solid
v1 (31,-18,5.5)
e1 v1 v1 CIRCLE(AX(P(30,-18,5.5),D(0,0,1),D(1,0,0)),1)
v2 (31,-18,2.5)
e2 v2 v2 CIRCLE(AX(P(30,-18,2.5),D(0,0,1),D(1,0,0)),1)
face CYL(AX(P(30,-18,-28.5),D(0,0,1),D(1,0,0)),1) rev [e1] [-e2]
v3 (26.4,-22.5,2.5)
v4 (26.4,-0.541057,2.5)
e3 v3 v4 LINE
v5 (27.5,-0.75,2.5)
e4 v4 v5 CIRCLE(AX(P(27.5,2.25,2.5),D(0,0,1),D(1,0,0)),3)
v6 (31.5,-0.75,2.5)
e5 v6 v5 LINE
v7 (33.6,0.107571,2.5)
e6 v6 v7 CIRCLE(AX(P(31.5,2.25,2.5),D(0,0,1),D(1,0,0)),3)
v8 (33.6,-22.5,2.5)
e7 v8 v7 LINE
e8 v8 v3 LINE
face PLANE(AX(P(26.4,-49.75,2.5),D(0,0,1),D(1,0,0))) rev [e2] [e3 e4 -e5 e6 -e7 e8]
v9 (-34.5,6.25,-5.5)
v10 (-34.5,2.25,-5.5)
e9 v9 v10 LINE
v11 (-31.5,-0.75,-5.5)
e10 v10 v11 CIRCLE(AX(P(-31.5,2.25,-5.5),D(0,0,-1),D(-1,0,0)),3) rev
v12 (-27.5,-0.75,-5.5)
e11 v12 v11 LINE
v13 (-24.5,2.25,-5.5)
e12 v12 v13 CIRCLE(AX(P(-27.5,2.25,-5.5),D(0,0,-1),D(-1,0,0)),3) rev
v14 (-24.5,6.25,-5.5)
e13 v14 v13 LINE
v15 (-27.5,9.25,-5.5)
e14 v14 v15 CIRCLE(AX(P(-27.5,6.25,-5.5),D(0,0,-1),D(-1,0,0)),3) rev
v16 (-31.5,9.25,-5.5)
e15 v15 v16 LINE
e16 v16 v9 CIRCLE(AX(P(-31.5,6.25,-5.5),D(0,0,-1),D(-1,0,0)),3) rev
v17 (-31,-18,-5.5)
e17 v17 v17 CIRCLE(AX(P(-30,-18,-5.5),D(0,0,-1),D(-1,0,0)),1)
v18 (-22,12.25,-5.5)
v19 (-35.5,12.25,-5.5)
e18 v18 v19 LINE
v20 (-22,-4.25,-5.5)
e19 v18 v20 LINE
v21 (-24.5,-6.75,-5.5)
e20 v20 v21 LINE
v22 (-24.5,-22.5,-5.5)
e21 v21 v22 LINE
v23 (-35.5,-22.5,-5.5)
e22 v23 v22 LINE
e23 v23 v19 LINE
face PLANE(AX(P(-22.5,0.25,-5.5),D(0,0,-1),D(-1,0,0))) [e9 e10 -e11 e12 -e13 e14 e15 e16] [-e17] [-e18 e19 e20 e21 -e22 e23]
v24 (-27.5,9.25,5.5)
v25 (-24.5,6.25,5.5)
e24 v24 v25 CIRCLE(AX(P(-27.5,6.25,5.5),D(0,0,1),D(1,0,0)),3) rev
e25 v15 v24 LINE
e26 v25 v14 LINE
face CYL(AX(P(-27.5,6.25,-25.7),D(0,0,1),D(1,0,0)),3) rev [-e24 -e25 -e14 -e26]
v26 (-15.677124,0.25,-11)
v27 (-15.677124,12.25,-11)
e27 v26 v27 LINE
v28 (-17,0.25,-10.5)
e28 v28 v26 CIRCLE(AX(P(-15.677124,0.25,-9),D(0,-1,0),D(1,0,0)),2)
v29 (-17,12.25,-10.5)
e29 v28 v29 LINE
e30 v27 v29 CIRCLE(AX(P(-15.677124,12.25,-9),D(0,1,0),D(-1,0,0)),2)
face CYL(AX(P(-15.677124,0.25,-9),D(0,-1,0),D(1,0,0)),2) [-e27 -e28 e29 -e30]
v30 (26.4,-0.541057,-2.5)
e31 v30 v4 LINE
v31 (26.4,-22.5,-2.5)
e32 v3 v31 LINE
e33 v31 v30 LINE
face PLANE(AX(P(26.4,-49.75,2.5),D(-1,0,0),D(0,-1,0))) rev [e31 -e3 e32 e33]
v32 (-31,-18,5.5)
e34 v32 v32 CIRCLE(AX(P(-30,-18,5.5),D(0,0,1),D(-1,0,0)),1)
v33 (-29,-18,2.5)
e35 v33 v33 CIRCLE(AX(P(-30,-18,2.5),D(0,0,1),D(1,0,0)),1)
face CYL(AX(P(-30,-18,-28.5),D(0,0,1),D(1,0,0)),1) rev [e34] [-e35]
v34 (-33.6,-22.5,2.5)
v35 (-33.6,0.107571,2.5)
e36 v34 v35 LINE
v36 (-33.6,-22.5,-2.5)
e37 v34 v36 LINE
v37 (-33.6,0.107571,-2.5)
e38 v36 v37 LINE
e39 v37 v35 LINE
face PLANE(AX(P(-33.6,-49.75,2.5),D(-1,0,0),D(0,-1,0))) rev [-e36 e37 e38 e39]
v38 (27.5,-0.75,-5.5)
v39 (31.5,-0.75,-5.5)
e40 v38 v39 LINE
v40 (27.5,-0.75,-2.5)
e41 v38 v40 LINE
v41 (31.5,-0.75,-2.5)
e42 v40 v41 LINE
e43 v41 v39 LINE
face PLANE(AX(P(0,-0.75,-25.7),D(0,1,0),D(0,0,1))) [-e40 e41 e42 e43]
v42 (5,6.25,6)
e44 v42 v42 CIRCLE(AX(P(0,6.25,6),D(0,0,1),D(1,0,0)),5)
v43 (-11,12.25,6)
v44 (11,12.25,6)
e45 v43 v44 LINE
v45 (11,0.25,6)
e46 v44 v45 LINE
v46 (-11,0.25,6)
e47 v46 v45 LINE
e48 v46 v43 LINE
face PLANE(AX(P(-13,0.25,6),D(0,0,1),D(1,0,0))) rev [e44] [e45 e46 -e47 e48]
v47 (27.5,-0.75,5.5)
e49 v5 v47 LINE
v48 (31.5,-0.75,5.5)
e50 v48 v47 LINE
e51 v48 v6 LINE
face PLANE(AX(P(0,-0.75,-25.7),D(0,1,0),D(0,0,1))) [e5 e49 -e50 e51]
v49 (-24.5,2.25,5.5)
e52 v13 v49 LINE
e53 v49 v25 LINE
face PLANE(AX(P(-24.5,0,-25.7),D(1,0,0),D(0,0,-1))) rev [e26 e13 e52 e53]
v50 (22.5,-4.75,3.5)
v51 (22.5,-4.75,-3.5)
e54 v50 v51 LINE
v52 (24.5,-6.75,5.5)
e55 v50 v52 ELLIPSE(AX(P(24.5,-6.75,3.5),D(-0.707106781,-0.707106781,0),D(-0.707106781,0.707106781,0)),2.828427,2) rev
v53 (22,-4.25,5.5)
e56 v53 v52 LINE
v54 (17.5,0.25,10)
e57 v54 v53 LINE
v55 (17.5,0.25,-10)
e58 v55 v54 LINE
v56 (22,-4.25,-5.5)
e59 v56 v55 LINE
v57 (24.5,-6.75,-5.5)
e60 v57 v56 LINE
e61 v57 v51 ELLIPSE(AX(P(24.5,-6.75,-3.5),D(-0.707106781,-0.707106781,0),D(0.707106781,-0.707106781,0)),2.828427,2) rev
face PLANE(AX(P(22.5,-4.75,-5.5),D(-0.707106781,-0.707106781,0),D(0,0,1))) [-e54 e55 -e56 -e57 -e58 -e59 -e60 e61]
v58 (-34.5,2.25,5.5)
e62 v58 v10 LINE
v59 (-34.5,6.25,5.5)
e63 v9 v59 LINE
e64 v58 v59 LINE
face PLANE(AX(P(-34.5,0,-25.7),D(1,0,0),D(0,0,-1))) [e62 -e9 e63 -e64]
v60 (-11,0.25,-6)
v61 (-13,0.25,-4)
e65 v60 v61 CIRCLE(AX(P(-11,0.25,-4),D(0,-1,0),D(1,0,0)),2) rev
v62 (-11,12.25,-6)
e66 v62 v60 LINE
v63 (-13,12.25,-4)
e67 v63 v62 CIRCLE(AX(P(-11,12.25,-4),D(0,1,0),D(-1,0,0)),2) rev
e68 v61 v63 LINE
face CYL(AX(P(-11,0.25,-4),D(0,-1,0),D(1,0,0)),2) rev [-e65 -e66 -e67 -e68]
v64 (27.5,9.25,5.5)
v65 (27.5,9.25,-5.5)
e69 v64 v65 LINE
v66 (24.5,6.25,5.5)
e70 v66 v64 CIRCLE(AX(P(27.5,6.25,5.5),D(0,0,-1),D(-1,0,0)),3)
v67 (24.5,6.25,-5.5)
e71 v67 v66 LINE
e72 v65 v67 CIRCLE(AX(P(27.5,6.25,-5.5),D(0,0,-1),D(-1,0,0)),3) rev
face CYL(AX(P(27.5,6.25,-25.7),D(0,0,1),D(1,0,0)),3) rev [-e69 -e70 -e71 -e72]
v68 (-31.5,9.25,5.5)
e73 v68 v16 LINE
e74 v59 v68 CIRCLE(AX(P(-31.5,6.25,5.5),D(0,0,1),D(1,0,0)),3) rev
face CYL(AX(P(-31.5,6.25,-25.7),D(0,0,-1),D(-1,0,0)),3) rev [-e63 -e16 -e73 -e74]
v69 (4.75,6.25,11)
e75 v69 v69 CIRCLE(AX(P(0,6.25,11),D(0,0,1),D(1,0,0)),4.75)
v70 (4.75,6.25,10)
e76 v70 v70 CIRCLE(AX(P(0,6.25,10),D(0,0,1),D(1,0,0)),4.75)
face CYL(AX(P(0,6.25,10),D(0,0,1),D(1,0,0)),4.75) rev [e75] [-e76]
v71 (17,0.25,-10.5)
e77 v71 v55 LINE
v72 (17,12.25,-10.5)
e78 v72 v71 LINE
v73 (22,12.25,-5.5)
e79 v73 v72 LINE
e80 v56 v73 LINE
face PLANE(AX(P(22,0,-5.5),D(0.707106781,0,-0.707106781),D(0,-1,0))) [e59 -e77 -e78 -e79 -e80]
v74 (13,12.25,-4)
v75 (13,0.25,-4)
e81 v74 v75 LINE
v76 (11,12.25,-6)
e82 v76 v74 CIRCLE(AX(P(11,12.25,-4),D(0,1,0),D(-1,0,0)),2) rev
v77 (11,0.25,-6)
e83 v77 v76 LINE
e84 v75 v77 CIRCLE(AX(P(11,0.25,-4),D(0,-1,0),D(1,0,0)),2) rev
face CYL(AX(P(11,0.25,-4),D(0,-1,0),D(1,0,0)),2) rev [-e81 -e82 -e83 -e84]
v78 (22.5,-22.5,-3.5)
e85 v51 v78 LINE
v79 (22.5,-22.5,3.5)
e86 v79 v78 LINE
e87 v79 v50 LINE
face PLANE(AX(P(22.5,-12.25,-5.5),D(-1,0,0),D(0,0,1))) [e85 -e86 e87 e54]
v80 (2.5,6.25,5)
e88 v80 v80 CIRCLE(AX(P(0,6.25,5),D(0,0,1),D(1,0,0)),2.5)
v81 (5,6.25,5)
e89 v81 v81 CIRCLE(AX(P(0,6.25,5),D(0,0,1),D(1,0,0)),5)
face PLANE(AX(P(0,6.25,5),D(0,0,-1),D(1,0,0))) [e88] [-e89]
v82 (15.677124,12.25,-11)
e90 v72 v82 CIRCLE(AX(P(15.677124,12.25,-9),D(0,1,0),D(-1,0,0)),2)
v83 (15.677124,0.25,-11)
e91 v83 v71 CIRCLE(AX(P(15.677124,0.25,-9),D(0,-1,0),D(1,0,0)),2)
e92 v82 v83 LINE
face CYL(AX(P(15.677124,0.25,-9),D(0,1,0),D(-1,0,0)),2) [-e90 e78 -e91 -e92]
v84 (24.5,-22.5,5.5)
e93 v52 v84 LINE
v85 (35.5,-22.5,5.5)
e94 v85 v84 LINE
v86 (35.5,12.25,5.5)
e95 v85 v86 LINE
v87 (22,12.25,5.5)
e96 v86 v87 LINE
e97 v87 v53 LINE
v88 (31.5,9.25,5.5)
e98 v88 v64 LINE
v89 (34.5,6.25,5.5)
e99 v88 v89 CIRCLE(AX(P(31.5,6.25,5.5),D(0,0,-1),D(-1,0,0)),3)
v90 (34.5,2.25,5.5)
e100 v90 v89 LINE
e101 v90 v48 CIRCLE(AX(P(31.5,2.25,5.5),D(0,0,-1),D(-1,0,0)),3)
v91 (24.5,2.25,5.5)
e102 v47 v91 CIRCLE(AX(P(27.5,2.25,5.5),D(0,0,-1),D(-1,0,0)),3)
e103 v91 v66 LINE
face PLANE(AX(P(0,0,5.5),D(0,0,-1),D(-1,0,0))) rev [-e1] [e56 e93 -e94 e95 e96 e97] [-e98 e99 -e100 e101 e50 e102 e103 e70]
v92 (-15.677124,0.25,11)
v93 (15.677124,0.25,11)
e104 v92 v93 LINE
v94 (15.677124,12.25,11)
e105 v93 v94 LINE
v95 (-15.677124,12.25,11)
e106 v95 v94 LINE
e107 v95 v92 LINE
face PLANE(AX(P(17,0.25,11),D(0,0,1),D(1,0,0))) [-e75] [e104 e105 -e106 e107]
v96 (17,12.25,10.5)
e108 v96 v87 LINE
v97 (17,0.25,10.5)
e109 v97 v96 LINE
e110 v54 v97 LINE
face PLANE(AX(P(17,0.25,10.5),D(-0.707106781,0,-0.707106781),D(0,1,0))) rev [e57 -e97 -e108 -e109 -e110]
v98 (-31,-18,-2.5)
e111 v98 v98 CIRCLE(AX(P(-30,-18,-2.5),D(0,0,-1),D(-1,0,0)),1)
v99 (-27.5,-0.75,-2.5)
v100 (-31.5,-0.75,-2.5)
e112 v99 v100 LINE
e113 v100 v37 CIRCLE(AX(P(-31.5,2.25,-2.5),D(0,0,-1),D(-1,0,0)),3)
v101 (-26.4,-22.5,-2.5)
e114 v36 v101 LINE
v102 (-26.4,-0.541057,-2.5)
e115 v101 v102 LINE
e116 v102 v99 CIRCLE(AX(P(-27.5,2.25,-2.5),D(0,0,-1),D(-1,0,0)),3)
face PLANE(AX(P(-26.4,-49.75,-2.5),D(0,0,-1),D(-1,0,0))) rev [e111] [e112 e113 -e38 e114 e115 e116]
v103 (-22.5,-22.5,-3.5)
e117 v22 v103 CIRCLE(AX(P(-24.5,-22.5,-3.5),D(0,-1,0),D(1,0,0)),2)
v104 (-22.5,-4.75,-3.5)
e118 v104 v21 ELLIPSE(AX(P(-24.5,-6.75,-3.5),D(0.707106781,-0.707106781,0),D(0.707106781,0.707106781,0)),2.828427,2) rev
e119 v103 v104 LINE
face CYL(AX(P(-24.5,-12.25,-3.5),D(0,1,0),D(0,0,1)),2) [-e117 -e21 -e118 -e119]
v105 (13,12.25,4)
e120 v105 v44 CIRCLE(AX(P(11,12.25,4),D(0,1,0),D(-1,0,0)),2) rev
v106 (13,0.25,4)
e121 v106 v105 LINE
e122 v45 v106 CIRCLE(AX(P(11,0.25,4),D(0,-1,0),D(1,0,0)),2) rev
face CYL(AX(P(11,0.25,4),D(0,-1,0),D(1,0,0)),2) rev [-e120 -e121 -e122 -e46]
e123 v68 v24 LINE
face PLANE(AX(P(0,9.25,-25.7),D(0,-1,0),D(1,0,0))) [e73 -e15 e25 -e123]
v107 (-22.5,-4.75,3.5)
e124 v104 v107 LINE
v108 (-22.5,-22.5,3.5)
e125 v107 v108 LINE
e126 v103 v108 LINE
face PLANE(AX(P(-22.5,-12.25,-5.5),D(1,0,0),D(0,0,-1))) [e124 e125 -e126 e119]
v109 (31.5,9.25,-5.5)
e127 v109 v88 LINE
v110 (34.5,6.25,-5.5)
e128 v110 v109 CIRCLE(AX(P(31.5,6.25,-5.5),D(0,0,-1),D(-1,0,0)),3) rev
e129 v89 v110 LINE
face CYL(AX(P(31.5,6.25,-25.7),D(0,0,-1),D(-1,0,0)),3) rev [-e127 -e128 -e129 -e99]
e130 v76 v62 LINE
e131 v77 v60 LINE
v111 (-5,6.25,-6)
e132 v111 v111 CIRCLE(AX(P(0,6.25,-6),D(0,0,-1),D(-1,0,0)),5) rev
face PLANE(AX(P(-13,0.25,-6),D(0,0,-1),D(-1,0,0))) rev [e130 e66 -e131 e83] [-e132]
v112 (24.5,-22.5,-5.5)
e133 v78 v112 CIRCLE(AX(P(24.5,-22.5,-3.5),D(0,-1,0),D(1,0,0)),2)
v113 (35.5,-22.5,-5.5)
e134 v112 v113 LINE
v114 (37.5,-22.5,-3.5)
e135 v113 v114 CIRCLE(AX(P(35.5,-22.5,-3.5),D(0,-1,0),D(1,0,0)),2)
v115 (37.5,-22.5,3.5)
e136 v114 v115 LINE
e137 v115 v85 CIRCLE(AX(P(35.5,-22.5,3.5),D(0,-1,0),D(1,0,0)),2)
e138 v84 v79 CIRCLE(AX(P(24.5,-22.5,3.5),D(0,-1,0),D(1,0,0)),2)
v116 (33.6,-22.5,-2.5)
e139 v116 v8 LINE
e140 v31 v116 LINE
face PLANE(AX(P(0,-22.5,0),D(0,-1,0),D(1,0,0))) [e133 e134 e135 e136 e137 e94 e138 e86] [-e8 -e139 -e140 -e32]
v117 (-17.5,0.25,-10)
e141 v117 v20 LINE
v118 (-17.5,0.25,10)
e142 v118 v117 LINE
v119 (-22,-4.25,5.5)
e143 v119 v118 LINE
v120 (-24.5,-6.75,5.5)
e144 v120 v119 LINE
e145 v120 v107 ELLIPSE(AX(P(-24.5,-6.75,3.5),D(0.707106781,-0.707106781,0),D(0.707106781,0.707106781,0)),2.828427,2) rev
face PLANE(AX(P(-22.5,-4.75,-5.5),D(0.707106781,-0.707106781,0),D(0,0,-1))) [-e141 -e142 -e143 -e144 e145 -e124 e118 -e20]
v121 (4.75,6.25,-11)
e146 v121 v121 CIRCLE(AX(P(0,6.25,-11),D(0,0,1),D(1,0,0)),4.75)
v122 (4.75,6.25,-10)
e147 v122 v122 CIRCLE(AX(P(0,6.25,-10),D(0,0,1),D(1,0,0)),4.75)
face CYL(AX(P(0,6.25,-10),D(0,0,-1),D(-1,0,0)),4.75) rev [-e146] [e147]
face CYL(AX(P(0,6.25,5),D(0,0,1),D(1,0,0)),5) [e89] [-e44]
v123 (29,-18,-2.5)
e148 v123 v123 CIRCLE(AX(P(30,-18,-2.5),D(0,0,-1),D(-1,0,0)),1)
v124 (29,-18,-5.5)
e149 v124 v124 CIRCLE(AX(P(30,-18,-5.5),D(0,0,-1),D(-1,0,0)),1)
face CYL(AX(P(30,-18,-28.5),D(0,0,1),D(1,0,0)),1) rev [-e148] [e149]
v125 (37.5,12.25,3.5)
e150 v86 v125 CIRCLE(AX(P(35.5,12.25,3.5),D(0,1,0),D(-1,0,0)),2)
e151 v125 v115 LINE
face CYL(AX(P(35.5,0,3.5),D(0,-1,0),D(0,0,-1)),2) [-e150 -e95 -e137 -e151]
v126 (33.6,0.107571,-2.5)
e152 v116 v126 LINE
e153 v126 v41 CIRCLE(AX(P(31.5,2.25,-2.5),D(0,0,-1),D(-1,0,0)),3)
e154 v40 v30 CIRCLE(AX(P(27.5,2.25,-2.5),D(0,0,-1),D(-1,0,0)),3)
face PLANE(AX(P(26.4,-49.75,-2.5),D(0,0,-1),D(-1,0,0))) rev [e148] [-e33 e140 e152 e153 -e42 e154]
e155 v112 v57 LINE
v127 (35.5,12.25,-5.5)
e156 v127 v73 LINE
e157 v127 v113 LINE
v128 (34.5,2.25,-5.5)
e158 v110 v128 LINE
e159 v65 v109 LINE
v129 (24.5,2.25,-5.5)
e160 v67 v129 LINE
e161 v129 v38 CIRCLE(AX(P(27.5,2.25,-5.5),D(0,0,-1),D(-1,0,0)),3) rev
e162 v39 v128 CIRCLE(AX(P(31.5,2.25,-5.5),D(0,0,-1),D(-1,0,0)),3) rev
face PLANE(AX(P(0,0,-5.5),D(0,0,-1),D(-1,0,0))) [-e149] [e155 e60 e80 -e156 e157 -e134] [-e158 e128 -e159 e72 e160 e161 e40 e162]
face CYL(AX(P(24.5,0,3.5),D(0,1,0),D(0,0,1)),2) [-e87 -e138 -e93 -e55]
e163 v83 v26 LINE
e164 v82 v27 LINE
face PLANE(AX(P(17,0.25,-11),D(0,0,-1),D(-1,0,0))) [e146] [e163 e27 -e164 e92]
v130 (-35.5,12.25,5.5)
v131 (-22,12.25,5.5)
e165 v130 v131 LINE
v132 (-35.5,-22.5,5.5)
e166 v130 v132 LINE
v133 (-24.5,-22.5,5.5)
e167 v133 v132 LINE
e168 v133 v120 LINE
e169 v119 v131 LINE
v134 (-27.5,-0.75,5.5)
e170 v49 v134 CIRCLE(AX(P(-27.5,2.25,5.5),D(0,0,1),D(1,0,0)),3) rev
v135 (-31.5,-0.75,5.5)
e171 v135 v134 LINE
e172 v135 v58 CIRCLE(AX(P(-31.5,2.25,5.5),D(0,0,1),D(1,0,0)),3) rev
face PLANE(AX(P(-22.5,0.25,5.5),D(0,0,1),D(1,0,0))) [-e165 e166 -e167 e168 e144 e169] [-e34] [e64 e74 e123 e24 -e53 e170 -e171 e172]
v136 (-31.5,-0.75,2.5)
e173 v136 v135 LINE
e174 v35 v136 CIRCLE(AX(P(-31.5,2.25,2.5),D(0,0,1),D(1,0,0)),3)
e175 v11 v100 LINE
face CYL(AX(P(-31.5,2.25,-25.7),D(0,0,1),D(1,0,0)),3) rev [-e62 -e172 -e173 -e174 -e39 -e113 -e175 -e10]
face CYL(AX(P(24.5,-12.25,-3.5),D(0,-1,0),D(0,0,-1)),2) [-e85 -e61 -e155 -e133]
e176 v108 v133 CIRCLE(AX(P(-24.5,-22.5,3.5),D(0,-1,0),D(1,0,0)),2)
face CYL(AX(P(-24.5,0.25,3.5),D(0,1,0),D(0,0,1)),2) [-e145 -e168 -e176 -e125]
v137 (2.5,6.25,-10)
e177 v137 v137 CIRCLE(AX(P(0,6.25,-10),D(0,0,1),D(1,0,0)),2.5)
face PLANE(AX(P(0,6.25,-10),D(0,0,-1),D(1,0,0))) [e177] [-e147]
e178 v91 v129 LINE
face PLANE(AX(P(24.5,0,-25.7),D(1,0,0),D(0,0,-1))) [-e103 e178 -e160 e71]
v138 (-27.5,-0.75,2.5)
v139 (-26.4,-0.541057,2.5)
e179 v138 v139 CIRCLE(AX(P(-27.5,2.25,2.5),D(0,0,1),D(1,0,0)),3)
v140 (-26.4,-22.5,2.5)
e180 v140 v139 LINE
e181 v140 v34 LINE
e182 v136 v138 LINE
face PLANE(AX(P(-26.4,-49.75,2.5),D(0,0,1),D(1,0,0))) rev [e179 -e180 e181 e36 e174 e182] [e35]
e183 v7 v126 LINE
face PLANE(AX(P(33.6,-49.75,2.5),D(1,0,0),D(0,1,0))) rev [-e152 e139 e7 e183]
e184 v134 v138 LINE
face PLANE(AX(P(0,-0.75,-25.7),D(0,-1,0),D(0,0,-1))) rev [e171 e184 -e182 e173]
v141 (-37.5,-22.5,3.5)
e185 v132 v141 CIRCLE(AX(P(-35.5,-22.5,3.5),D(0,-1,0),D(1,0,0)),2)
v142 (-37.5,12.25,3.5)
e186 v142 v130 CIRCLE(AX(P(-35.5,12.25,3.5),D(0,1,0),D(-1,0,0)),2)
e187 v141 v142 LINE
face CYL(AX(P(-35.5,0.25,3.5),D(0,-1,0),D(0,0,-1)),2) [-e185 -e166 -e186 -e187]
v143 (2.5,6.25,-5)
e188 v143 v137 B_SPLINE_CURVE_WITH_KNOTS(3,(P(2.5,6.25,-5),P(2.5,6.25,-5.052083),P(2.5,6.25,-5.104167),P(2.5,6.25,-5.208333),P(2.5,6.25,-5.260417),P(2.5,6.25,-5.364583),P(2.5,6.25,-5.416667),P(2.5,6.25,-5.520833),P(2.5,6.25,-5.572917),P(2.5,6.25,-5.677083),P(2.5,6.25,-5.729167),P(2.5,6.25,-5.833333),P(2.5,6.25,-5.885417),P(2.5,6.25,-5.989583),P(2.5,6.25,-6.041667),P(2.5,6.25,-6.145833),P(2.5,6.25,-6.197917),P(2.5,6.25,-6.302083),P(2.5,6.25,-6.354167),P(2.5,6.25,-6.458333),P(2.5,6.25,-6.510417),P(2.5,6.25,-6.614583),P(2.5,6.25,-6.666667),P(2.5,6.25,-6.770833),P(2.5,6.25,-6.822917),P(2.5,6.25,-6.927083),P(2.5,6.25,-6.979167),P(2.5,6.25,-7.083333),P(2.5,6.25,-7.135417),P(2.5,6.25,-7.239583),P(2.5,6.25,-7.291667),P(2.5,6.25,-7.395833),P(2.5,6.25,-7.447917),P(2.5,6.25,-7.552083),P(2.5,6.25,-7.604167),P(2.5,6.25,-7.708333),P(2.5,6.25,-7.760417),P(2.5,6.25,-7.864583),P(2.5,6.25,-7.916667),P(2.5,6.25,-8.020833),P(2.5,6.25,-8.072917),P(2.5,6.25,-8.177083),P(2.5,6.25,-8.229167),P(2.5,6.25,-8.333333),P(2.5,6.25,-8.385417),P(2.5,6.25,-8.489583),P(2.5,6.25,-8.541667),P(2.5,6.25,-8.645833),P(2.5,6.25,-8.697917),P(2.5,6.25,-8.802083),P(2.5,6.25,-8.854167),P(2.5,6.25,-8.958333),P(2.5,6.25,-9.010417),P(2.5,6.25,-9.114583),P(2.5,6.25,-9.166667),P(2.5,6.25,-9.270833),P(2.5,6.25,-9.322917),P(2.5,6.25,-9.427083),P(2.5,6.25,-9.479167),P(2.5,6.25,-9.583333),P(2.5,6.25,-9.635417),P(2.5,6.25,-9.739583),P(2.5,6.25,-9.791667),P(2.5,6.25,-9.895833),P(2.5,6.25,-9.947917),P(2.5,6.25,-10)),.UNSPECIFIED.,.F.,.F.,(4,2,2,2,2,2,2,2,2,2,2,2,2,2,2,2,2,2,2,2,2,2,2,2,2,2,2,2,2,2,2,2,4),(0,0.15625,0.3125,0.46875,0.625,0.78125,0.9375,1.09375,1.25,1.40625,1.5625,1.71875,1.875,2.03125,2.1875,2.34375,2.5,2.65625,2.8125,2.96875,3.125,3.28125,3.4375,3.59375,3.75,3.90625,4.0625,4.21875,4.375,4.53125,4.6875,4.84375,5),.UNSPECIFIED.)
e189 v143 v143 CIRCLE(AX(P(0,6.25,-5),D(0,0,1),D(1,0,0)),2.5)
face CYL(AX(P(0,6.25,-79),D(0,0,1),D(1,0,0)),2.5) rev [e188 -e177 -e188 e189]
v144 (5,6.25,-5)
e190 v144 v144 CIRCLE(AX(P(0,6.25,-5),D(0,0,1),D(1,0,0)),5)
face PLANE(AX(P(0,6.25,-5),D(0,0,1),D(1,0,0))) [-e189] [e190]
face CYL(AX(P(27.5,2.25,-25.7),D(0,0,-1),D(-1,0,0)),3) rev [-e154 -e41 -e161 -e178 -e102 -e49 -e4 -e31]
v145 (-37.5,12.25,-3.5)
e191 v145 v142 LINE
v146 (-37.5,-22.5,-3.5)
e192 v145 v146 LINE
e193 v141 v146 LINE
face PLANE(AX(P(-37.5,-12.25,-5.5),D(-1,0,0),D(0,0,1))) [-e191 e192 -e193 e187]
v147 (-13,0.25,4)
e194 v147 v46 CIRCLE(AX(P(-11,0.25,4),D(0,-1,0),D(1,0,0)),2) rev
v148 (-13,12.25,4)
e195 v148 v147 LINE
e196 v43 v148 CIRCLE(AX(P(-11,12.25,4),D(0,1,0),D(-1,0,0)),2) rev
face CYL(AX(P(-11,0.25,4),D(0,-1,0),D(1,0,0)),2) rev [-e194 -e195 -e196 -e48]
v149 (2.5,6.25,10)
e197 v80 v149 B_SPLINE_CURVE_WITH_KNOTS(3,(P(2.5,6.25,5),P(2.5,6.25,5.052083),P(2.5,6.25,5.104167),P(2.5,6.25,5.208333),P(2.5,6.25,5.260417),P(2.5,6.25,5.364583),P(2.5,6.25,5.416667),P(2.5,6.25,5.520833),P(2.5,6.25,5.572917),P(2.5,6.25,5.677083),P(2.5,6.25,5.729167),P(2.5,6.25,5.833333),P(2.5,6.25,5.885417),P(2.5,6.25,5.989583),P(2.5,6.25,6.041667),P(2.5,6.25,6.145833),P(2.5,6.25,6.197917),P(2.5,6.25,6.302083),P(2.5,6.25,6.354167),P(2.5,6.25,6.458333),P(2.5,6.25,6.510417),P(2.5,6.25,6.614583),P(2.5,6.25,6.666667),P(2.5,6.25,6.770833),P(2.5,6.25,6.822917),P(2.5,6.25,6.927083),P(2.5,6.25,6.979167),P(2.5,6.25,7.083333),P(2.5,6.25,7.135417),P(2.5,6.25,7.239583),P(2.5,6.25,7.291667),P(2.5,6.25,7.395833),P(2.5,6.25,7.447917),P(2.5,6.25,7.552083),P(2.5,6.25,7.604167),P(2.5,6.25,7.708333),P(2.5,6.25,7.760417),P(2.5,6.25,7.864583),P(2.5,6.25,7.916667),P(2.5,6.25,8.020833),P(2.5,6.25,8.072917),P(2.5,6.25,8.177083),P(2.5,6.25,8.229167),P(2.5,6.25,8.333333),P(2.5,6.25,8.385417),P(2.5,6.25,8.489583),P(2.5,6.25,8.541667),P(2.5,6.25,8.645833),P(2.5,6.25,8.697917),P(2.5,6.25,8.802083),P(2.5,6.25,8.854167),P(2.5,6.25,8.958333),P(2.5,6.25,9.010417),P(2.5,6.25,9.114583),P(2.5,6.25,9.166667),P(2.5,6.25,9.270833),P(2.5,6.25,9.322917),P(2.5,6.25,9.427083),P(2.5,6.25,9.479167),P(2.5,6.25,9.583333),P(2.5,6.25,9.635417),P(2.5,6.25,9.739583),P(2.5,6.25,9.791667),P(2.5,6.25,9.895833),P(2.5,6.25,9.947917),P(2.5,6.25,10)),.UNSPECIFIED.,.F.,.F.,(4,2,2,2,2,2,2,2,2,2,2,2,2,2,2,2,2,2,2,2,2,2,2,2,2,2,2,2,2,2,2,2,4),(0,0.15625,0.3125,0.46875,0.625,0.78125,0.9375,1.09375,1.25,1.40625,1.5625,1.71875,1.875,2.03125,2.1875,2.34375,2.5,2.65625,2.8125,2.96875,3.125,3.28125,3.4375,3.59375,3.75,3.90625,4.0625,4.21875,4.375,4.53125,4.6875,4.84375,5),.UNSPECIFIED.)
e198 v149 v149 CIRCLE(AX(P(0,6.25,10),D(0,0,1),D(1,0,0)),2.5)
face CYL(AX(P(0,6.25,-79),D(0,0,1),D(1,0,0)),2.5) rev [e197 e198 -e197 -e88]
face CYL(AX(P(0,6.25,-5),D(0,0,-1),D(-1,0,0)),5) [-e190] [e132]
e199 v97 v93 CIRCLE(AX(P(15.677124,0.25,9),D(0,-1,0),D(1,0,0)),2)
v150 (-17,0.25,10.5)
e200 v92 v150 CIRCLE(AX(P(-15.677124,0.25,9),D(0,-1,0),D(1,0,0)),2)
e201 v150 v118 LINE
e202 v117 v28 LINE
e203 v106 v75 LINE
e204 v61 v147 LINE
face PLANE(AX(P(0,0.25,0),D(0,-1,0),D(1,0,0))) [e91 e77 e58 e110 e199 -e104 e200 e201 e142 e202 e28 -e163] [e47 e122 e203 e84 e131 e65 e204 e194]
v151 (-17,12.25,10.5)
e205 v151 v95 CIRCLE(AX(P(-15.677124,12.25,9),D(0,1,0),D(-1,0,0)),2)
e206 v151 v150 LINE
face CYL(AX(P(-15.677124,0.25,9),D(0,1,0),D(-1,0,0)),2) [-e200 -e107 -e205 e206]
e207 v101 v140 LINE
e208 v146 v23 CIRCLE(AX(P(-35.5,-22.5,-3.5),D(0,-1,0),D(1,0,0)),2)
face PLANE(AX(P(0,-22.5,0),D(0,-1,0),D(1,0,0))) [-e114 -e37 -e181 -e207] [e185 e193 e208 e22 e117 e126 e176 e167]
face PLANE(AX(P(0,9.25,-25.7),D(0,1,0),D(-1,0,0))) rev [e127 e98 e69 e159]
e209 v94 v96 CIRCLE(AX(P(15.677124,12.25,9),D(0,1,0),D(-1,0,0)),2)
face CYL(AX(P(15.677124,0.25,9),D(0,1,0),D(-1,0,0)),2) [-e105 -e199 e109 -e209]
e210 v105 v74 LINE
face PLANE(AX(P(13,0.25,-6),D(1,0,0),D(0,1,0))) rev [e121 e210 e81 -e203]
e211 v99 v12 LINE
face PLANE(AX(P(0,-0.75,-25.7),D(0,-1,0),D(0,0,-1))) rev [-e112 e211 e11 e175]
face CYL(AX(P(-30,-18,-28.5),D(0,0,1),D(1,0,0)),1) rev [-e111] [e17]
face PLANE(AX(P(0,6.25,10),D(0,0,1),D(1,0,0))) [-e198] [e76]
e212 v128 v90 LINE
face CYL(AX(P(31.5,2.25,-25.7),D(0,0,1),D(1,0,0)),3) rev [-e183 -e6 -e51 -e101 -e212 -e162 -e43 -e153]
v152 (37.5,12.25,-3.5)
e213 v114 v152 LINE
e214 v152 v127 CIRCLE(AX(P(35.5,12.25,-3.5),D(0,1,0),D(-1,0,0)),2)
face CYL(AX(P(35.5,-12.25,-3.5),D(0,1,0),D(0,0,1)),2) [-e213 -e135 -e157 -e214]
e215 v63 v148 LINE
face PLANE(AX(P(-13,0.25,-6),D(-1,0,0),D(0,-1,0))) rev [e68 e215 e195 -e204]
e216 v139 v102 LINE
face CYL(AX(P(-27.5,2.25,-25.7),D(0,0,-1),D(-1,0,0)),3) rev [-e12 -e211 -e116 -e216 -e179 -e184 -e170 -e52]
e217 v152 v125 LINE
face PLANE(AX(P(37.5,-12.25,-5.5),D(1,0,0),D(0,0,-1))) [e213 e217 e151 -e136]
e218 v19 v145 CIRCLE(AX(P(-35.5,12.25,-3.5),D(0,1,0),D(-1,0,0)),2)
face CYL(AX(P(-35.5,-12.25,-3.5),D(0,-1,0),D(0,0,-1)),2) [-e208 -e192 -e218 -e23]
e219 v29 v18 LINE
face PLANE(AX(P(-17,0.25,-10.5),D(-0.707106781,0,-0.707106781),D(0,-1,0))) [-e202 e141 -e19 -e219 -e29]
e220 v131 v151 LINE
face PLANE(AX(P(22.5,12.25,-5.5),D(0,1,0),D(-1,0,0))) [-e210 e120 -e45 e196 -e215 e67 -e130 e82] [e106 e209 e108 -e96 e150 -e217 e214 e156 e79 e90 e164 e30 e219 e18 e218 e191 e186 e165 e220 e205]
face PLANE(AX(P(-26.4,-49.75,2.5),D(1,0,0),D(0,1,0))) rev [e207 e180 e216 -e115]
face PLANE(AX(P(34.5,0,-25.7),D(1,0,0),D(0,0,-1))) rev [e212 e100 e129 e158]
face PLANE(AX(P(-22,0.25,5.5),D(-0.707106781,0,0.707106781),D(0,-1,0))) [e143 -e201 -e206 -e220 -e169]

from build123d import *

# Parameters (mm, degrees)
EXTRUDE_1_DEPTH        = 5.5
EXTRUDE_1_DEPTH_BACK   = 5.5
SKETCH_1_W             = 15
SKETCH_1_H             = 24.5
EXTRUDE_1_2_DEPTH      = 5.5
EXTRUDE_1_2_DEPTH_BACK = 5.5
SKETCH_2_W             = 7.2
SKETCH_2_H             = 5
CUT_EXTRUDE_1_DEPTH    = 62
SKETCH_3_W             = 26
SKETCH_3_H             = 12
EXTRUDE_2_DEPTH        = 12
SKETCH_4_R             = 2.5
CUT_EXTRUDE_2_DEPTH    = 90
CHAMFER_2_SIZE         = 5
FILLET_2_R             = 2
SKETCH_14_W            = 15
SKETCH_14_H            = 11
SKETCH_14_W_2          = 7.2
SKETCH_14_H_2          = 5
EXTRUDE_5_DEPTH        = 10.25
SKETCH_7_R             = 1
CUT_EXTRUDE_3_DEPTH    = 34
EXTRUDE_START          = 1
SKETCH_13_R            = 5
SKETCH_13_R_2          = 2.5
EXTRUDE_4_DEPTH        = 1
CHAMFER_3_SIZE         = 5
SKETCH_19_W            = 10
SKETCH_19_H            = 10
CUT_EXTRUDE_4_DEPTH    = 31.2
SKETCH_17_R            = 4.75
SKETCH_17_R_2          = 2.5
CUT_EXTRUDE_5_DEPTH    = 1
SKETCH_20_W            = 7.2
SKETCH_20_H            = 3
EXTRUDE_6_DEPTH        = 5
FILLET_6_R             = 3
FILLET_7_R             = 2


with BuildPart() as part:
    # 草图1 → 凸台-拉伸1 (new, two sides: drawn at the far end of the back side and taken through both)
    with BuildSketch(Plane.XY.offset(-EXTRUDE_1_DEPTH_BACK)):
        with Locations((30, 0)):
            Rectangle(SKETCH_1_W, SKETCH_1_H)
    extrude(amount=EXTRUDE_1_DEPTH + EXTRUDE_1_DEPTH_BACK)


with BuildPart() as body_2:
    # 草图1 → Extrude 1 2 (new, two sides: drawn at the far end of the back side and taken through both)
    with BuildSketch(Plane.XY.offset(-EXTRUDE_1_2_DEPTH_BACK)):
        with Locations((-30, 0)):
            Rectangle(SKETCH_1_W, SKETCH_1_H)
    extrude(amount=EXTRUDE_1_2_DEPTH + EXTRUDE_1_2_DEPTH_BACK)


with BuildPart() as cut_extrude_1_tool:
    # 草图2 → 切除-拉伸1 (new body)
    with BuildSketch(Plane(origin=(0, 12.25, 0), x_dir=(1, 0, 0), z_dir=(0, 1, 0))):
        with Locations((30, 0)):
            Rectangle(SKETCH_2_W, SKETCH_2_H)
        with Locations((-30, 0)):
            Rectangle(SKETCH_2_W, SKETCH_2_H)
    extrude(amount=-CUT_EXTRUDE_1_DEPTH)


with BuildPart() as part_1:
    add(part.part)

    # 切除-拉伸1: cut by cut_extrude_1_tool
    add(cut_extrude_1_tool.part, mode=Mode.SUBTRACT)



with BuildPart() as body_2_1:
    add(body_2.part)

    # 切除-拉伸1: cut by cut_extrude_1_tool
    add(cut_extrude_1_tool.part, mode=Mode.SUBTRACT)


with BuildPart() as part_2:
    add(part_1.part)

    add(body_2_1.part)  # 凸台-拉伸2 merges body 2
    # 草图3 → 凸台-拉伸2 (add)
    with BuildSketch(Plane(origin=(0, 12.25, 0), x_dir=(1, 0, 0), z_dir=(0, 1, 0))):
        Polygon((22.5, 5.5), (17, 5.5), (17, 11), (-17, 11), (-17, 5.5), (-22.5, 5.5), (-22.5, -5.5), (-17, -5.5), (-17, -11), (17, -11), (17, -5.5), (22.5, -5.5), align=None)
        Rectangle(SKETCH_3_W, SKETCH_3_H, mode=Mode.SUBTRACT)
    extrude(amount=-EXTRUDE_2_DEPTH)

    # 草图4 → 切除-拉伸2 (cut)
    with BuildSketch(Plane.XY.offset(11)):
        with Locations((0, 6.25)):
            Circle(SKETCH_4_R)
    extrude(amount=-CUT_EXTRUDE_2_DEPTH, mode=Mode.SUBTRACT)

    # 倒角2
    chamfer_2_edges = [part_2.edges().sort_by_distance(p)[0] for p in [
        (17, 6.25, 5.5),
        (-17, 6.25, 5.5),
        (-17, 6.25, -5.5),
        (17, 6.25, -5.5),
    ]]
    chamfer(chamfer_2_edges, length=CHAMFER_2_SIZE)

    # 圆角2
    # the kernel refuses this fillet: 2 mm, written as the material it adds along each edge
    with BuildSketch(Plane(origin=(-13, 12.25, 6), x_dir=(0, 0, -1), z_dir=(0, -1, 0)), Plane(origin=(13, 12.25, 6), x_dir=(-1, 0, 0), z_dir=(0, -1, 0)), Plane(origin=(13, 12.25, -6), x_dir=(0, 0, 1), z_dir=(0, -1, 0))) as fillet_2_piece_1:
        with BuildLine():
            CenterArc((FILLET_2_R, FILLET_2_R), FILLET_2_R, 180, 90)
            Line((0, FILLET_2_R), (0, 0))
            Line((0, 0), (FILLET_2_R, 0))
        make_face()
    extrude(amount=12)
    with BuildSketch(Plane(origin=(-13, 12.25, -6), x_dir=(0, 0, 1), z_dir=(0, -1, 0))) as fillet_2_piece_2:
        with BuildLine():
            CenterArc((FILLET_2_R, -FILLET_2_R), FILLET_2_R, 90, 90)
            Line((0, -FILLET_2_R), (0, 0))
            Line((0, 0), (FILLET_2_R, 0))
        make_face()
    extrude(amount=12)
    # the kernel refuses this fillet: 2 mm, written as the material it takes off along each edge
    with BuildSketch(Plane(origin=(17, 15.557189139, 11), x_dir=(0, 0, -1), z_dir=(0, -1, 0))) as fillet_2_2_piece_1:
        with BuildLine():
            CenterArc((2, -1.322875656), FILLET_2_R, 138.590377891, 41.409622109)
            Line((0, -1.322875656), (0, 0))
            Line((0, 0), (0.5, 0))
        make_face()
    extrude(amount=18.614378278, mode=Mode.SUBTRACT)
    with BuildSketch(Plane(origin=(-17, 15.557189139, 11), x_dir=(1, 0, 0), z_dir=(0, -1, 0))) as fillet_2_2_piece_2:
        with BuildLine():
            CenterArc((1.322875656, -2), FILLET_2_R, 90, 41.409622109)
            Line((0, -0.5), (0, 0))
            Line((0, 0), (1.322875656, 0))
        make_face()
    extrude(amount=18.614378278, mode=Mode.SUBTRACT)
    with BuildSketch(Plane(origin=(-17, 15.557189139, -11), x_dir=(1, 0, 0), z_dir=(0, -1, 0))) as fillet_2_2_piece_3:
        with BuildLine():
            CenterArc((1.322875656, 2), FILLET_2_R, 228.590377891, 41.409622109)
            Line((0, 0.5), (0, 0))
            Line((0, 0), (1.322875656, 0))
        make_face()
    extrude(amount=18.614378278, mode=Mode.SUBTRACT)
    with BuildSketch(Plane(origin=(17, 15.557189139, -11), x_dir=(0, 0, 1), z_dir=(0, -1, 0))) as fillet_2_2_piece_4:
        with BuildLine():
            CenterArc((2, 1.322875656), FILLET_2_R, 180, 41.409622109)
            Line((0, 1.322875656), (0, 0))
            Line((0, 0), (0.5, 0))
        make_face()
    extrude(amount=18.614378278, mode=Mode.SUBTRACT)

    # 草图14 → 凸台-拉伸5 (add)
    # profile 1 of 2: a face of its own
    with BuildSketch(Plane.XZ.offset(12.25)):
        with Locations((-30, 0)):
            Rectangle(SKETCH_14_W, SKETCH_14_H)
        with Locations((-30, 0)):
            Rectangle(SKETCH_14_W_2, SKETCH_14_H_2, mode=Mode.SUBTRACT)
    # profile 2 of 2: a face of its own
    with BuildSketch(Plane.XZ.offset(12.25)):
        with Locations((30, 0)):
            Rectangle(SKETCH_14_W, SKETCH_14_H)
        with Locations((30, 0)):
            Rectangle(SKETCH_14_W_2, SKETCH_14_H_2, mode=Mode.SUBTRACT)
    extrude(amount=EXTRUDE_5_DEPTH)

    # 草图7 → 切除-拉伸3 (cut)
    with BuildSketch(Plane.XY.offset(5.5)):
        with Locations(Location((30, -18, 0), (0, 0, 180))):
            Circle(SKETCH_7_R)
        with Locations(Location((-30, -18, 0), (0, 0, 180))):
            Circle(SKETCH_7_R)
    extrude(amount=-CUT_EXTRUDE_3_DEPTH, mode=Mode.SUBTRACT)

    # 草图13 → 凸台-拉伸4 (add)
    with BuildSketch(Plane.XY.offset(-6).offset(EXTRUDE_START)):
        with Locations(Location((0, 6.25, 0), (0, 0, 180))):
            Circle(SKETCH_13_R)
        with Locations((0, 6.25)):
            Circle(SKETCH_13_R_2, mode=Mode.SUBTRACT)
    extrude_4 = extrude(amount=-EXTRUDE_4_DEPTH)

    # 镜向1: 凸台-拉伸4 across plane
    add(extrude_4.mirror(Plane.XY))

    # 倒角3
    chamfer_3_edges = [part_2.edges().sort_by_distance(p)[0] for p in [
        (22.5, 0.25, 0),
        (-22.5, 0.25, 0),
    ]]
    chamfer(chamfer_3_edges, length=CHAMFER_3_SIZE)

    # 草图19 → 切除-拉伸4 (cut)
    with BuildSketch(Plane.XY.offset(5.5)):
        with Locations((-29.5, 4.25)):
            Rectangle(SKETCH_19_W, SKETCH_19_H)
        with Locations((29.5, 4.25)):
            Rectangle(SKETCH_19_W, SKETCH_19_H)
    extrude(amount=-CUT_EXTRUDE_4_DEPTH, mode=Mode.SUBTRACT)

    # 草图17 → 切除-拉伸5 (cut)
    with BuildSketch(Plane.XY.offset(11)):
        with Locations((0, 6.25)):
            Circle(SKETCH_17_R)
        with Locations((0, 6.25)):
            Circle(SKETCH_17_R_2, mode=Mode.SUBTRACT)
    cut_extrude_5 = extrude(amount=-CUT_EXTRUDE_5_DEPTH, mode=Mode.SUBTRACT)

    # 镜向2: 切除-拉伸5 across plane
    add(cut_extrude_5.mirror(Plane.XY), mode=Mode.SUBTRACT)

    # 草图20 → 凸台-拉伸6 (add)
    with BuildSketch(Plane.XY.offset(-2.5)):
        with Locations((-30, 10.75)):
            Rectangle(SKETCH_20_W, SKETCH_20_H)
        with Locations((30, 10.75)):
            Rectangle(SKETCH_20_W, SKETCH_20_H)
    extrude(amount=EXTRUDE_6_DEPTH)

    # 圆角6
    # the kernel refuses this fillet: 3 mm, written as the material it adds along each edge
    with BuildSketch(Plane(origin=(24.5, -0.75, 5.5), x_dir=(0, 1, 0), z_dir=(0, 0, -1))) as fillet_6_piece_1_section:
        with BuildLine():
            CenterArc((FILLET_6_R, FILLET_6_R), FILLET_6_R, 180, 90)
            Line((0, FILLET_6_R), (0, 0))
            Line((0, 0), (FILLET_6_R, 0))
        make_face()
    fillet_6_piece_1 = extrude(amount=11, mode=Mode.PRIVATE)
    fillet_6_piece_1 = split(fillet_6_piece_1, bisect_by=Plane(origin=(24.5, -0.75, 2.5), z_dir=(0, 0, 1)), keep=Keep.TOP, mode=Mode.PRIVATE)
    fillet_6_piece_1 = split(fillet_6_piece_1, bisect_by=Plane(origin=(26.4, -0.75, 5.5), z_dir=(-1, 0, 0)), keep=Keep.TOP, mode=Mode.PRIVATE)
    add(fillet_6_piece_1)
    with BuildSketch(Plane(origin=(24.5, -0.75, 5.5), x_dir=(0, 1, 0), z_dir=(0, 0, -1))) as fillet_6_piece_2_section:
        with BuildLine():
            CenterArc((FILLET_6_R, FILLET_6_R), FILLET_6_R, 180, 90)
            Line((0, FILLET_6_R), (0, 0))
            Line((0, 0), (FILLET_6_R, 0))
        make_face()
    fillet_6_piece_2 = extrude(amount=11, mode=Mode.PRIVATE)
    fillet_6_piece_2 = split(fillet_6_piece_2, bisect_by=Plane(origin=(24.5, -0.75, 2.5), z_dir=(0, 0, 1)), keep=Keep.TOP, mode=Mode.PRIVATE)
    fillet_6_piece_2 = split(fillet_6_piece_2, bisect_by=Plane(origin=(26.4, -0.75, 5.5), z_dir=(1, 0, 0)), keep=Keep.TOP, mode=Mode.PRIVATE)
    add(fillet_6_piece_2)
    with BuildSketch(Plane(origin=(24.5, -0.75, 5.5), x_dir=(0, 1, 0), z_dir=(0, 0, -1))) as fillet_6_piece_3_section:
        with BuildLine():
            CenterArc((FILLET_6_R, FILLET_6_R), FILLET_6_R, 180, 90)
            Line((0, FILLET_6_R), (0, 0))
            Line((0, 0), (FILLET_6_R, 0))
        make_face()
    fillet_6_piece_3 = extrude(amount=11, mode=Mode.PRIVATE)
    fillet_6_piece_3 = split(fillet_6_piece_3, bisect_by=Plane(origin=(24.5, -0.75, -2.5), z_dir=(0, 0, 1)), keep=Keep.TOP, mode=Mode.PRIVATE)
    fillet_6_piece_3 = split(fillet_6_piece_3, bisect_by=Plane(origin=(24.5, -0.75, 2.5), z_dir=(0, 0, -1)), keep=Keep.TOP, mode=Mode.PRIVATE)
    fillet_6_piece_3 = split(fillet_6_piece_3, bisect_by=Plane(origin=(26.4, -0.75, 5.5), z_dir=(-1, 0, 0)), keep=Keep.TOP, mode=Mode.PRIVATE)
    add(fillet_6_piece_3)
    with BuildSketch(Plane(origin=(24.5, -0.75, 5.5), x_dir=(0, 1, 0), z_dir=(0, 0, -1))) as fillet_6_piece_4_section:
        with BuildLine():
            CenterArc((FILLET_6_R, FILLET_6_R), FILLET_6_R, 180, 90)
            Line((0, FILLET_6_R), (0, 0))
            Line((0, 0), (FILLET_6_R, 0))
        make_face()
    fillet_6_piece_4 = extrude(amount=11, mode=Mode.PRIVATE)
    fillet_6_piece_4 = split(fillet_6_piece_4, bisect_by=Plane(origin=(24.5, -0.75, -2.5), z_dir=(0, 0, -1)), keep=Keep.TOP, mode=Mode.PRIVATE)
    fillet_6_piece_4 = split(fillet_6_piece_4, bisect_by=Plane(origin=(26.4, -0.75, 5.5), z_dir=(-1, 0, 0)), keep=Keep.TOP, mode=Mode.PRIVATE)
    add(fillet_6_piece_4)
    with BuildSketch(Plane(origin=(24.5, -0.75, 5.5), x_dir=(0, 1, 0), z_dir=(0, 0, -1))) as fillet_6_piece_5_section:
        with BuildLine():
            CenterArc((FILLET_6_R, FILLET_6_R), FILLET_6_R, 180, 90)
            Line((0, FILLET_6_R), (0, 0))
            Line((0, 0), (FILLET_6_R, 0))
        make_face()
    fillet_6_piece_5 = extrude(amount=11, mode=Mode.PRIVATE)
    fillet_6_piece_5 = split(fillet_6_piece_5, bisect_by=Plane(origin=(24.5, -0.75, -2.5), z_dir=(0, 0, -1)), keep=Keep.TOP, mode=Mode.PRIVATE)
    fillet_6_piece_5 = split(fillet_6_piece_5, bisect_by=Plane(origin=(26.4, -0.75, 5.5), z_dir=(1, 0, 0)), keep=Keep.TOP, mode=Mode.PRIVATE)
    add(fillet_6_piece_5)
    with BuildSketch(Plane(origin=(-24.5, -0.75, 5.5), x_dir=(-1, 0, 0), z_dir=(0, 0, -1))) as fillet_6_piece_6_section:
        with BuildLine():
            CenterArc((FILLET_6_R, FILLET_6_R), FILLET_6_R, 180, 90)
            Line((0, FILLET_6_R), (0, 0))
            Line((0, 0), (FILLET_6_R, 0))
        make_face()
    fillet_6_piece_6 = extrude(amount=11, mode=Mode.PRIVATE)
    fillet_6_piece_6 = split(fillet_6_piece_6, bisect_by=Plane(origin=(-24.5, -0.75, 2.5), z_dir=(0, 0, 1)), keep=Keep.TOP, mode=Mode.PRIVATE)
    fillet_6_piece_6 = split(fillet_6_piece_6, bisect_by=Plane(origin=(-26.4, -0.75, 5.5), z_dir=(-1, 0, 0)), keep=Keep.TOP, mode=Mode.PRIVATE)
    add(fillet_6_piece_6)
    with BuildSketch(Plane(origin=(-24.5, -0.75, 5.5), x_dir=(-1, 0, 0), z_dir=(0, 0, -1))) as fillet_6_piece_7_section:
        with BuildLine():
            CenterArc((FILLET_6_R, FILLET_6_R), FILLET_6_R, 180, 90)
            Line((0, FILLET_6_R), (0, 0))
            Line((0, 0), (FILLET_6_R, 0))
        make_face()
    fillet_6_piece_7 = extrude(amount=11, mode=Mode.PRIVATE)
    fillet_6_piece_7 = split(fillet_6_piece_7, bisect_by=Plane(origin=(-24.5, -0.75, 2.5), z_dir=(0, 0, 1)), keep=Keep.TOP, mode=Mode.PRIVATE)
    fillet_6_piece_7 = split(fillet_6_piece_7, bisect_by=Plane(origin=(-26.4, -0.75, 5.5), z_dir=(1, 0, 0)), keep=Keep.TOP, mode=Mode.PRIVATE)
    add(fillet_6_piece_7)
    with BuildSketch(Plane(origin=(-24.5, -0.75, 5.5), x_dir=(-1, 0, 0), z_dir=(0, 0, -1))) as fillet_6_piece_8_section:
        with BuildLine():
            CenterArc((FILLET_6_R, FILLET_6_R), FILLET_6_R, 180, 90)
            Line((0, FILLET_6_R), (0, 0))
            Line((0, 0), (FILLET_6_R, 0))
        make_face()
    fillet_6_piece_8 = extrude(amount=11, mode=Mode.PRIVATE)
    fillet_6_piece_8 = split(fillet_6_piece_8, bisect_by=Plane(origin=(-24.5, -0.75, 2.5), z_dir=(0, 0, -1)), keep=Keep.TOP, mode=Mode.PRIVATE)
    fillet_6_piece_8 = split(fillet_6_piece_8, bisect_by=Plane(origin=(-24.5, -0.75, -2.5), z_dir=(0, 0, 1)), keep=Keep.TOP, mode=Mode.PRIVATE)
    fillet_6_piece_8 = split(fillet_6_piece_8, bisect_by=Plane(origin=(-26.4, -0.75, 5.5), z_dir=(1, 0, 0)), keep=Keep.TOP, mode=Mode.PRIVATE)
    add(fillet_6_piece_8)
    with BuildSketch(Plane(origin=(-24.5, -0.75, 5.5), x_dir=(-1, 0, 0), z_dir=(0, 0, -1))) as fillet_6_piece_9_section:
        with BuildLine():
            CenterArc((FILLET_6_R, FILLET_6_R), FILLET_6_R, 180, 90)
            Line((0, FILLET_6_R), (0, 0))
            Line((0, 0), (FILLET_6_R, 0))
        make_face()
    fillet_6_piece_9 = extrude(amount=11, mode=Mode.PRIVATE)
    fillet_6_piece_9 = split(fillet_6_piece_9, bisect_by=Plane(origin=(-24.5, -0.75, -2.5), z_dir=(0, 0, -1)), keep=Keep.TOP, mode=Mode.PRIVATE)
    fillet_6_piece_9 = split(fillet_6_piece_9, bisect_by=Plane(origin=(-26.4, -0.75, 5.5), z_dir=(-1, 0, 0)), keep=Keep.TOP, mode=Mode.PRIVATE)
    add(fillet_6_piece_9)
    with BuildSketch(Plane(origin=(-24.5, -0.75, 5.5), x_dir=(-1, 0, 0), z_dir=(0, 0, -1))) as fillet_6_piece_10_section:
        with BuildLine():
            CenterArc((FILLET_6_R, FILLET_6_R), FILLET_6_R, 180, 90)
            Line((0, FILLET_6_R), (0, 0))
            Line((0, 0), (FILLET_6_R, 0))
        make_face()
    fillet_6_piece_10 = extrude(amount=11, mode=Mode.PRIVATE)
    fillet_6_piece_10 = split(fillet_6_piece_10, bisect_by=Plane(origin=(-24.5, -0.75, -2.5), z_dir=(0, 0, -1)), keep=Keep.TOP, mode=Mode.PRIVATE)
    fillet_6_piece_10 = split(fillet_6_piece_10, bisect_by=Plane(origin=(-26.4, -0.75, 5.5), z_dir=(1, 0, 0)), keep=Keep.TOP, mode=Mode.PRIVATE)
    add(fillet_6_piece_10)
    with BuildSketch(Plane(origin=(34.5, -0.75, 5.5), x_dir=(-1, 0, 0), z_dir=(0, 0, -1))) as fillet_6_piece_11_section:
        with BuildLine():
            CenterArc((FILLET_6_R, FILLET_6_R), FILLET_6_R, 180, 90)
            Line((0, FILLET_6_R), (0, 0))
            Line((0, 0), (FILLET_6_R, 0))
        make_face()
    fillet_6_piece_11 = extrude(amount=11, mode=Mode.PRIVATE)
    fillet_6_piece_11 = split(fillet_6_piece_11, bisect_by=Plane(origin=(33.6, -0.75, 5.5), z_dir=(-1, 0, 0)), keep=Keep.TOP, mode=Mode.PRIVATE)
    fillet_6_piece_11 = split(fillet_6_piece_11, bisect_by=Plane(origin=(34.5, -0.75, 2.5), z_dir=(0, 0, 1)), keep=Keep.TOP, mode=Mode.PRIVATE)
    add(fillet_6_piece_11)
    with BuildSketch(Plane(origin=(34.5, -0.75, 5.5), x_dir=(-1, 0, 0), z_dir=(0, 0, -1))) as fillet_6_piece_12_section:
        with BuildLine():
            CenterArc((FILLET_6_R, FILLET_6_R), FILLET_6_R, 180, 90)
            Line((0, FILLET_6_R), (0, 0))
            Line((0, 0), (FILLET_6_R, 0))
        make_face()
    fillet_6_piece_12 = extrude(amount=11, mode=Mode.PRIVATE)
    fillet_6_piece_12 = split(fillet_6_piece_12, bisect_by=Plane(origin=(33.6, -0.75, 5.5), z_dir=(1, 0, 0)), keep=Keep.TOP, mode=Mode.PRIVATE)
    fillet_6_piece_12 = split(fillet_6_piece_12, bisect_by=Plane(origin=(34.5, -0.75, 2.5), z_dir=(0, 0, 1)), keep=Keep.TOP, mode=Mode.PRIVATE)
    add(fillet_6_piece_12)
    with BuildSketch(Plane(origin=(34.5, -0.75, 5.5), x_dir=(-1, 0, 0), z_dir=(0, 0, -1))) as fillet_6_piece_13_section:
        with BuildLine():
            CenterArc((FILLET_6_R, FILLET_6_R), FILLET_6_R, 180, 90)
            Line((0, FILLET_6_R), (0, 0))
            Line((0, 0), (FILLET_6_R, 0))
        make_face()
    fillet_6_piece_13 = extrude(amount=11, mode=Mode.PRIVATE)
    fillet_6_piece_13 = split(fillet_6_piece_13, bisect_by=Plane(origin=(34.5, -0.75, -2.5), z_dir=(0, 0, 1)), keep=Keep.TOP, mode=Mode.PRIVATE)
    fillet_6_piece_13 = split(fillet_6_piece_13, bisect_by=Plane(origin=(33.6, -0.75, 5.5), z_dir=(1, 0, 0)), keep=Keep.TOP, mode=Mode.PRIVATE)
    fillet_6_piece_13 = split(fillet_6_piece_13, bisect_by=Plane(origin=(34.5, -0.75, 2.5), z_dir=(0, 0, -1)), keep=Keep.TOP, mode=Mode.PRIVATE)
    add(fillet_6_piece_13)
    with BuildSketch(Plane(origin=(34.5, -0.75, 5.5), x_dir=(-1, 0, 0), z_dir=(0, 0, -1))) as fillet_6_piece_14_section:
        with BuildLine():
            CenterArc((FILLET_6_R, FILLET_6_R), FILLET_6_R, 180, 90)
            Line((0, FILLET_6_R), (0, 0))
            Line((0, 0), (FILLET_6_R, 0))
        make_face()
    fillet_6_piece_14 = extrude(amount=11, mode=Mode.PRIVATE)
    fillet_6_piece_14 = split(fillet_6_piece_14, bisect_by=Plane(origin=(34.5, -0.75, -2.5), z_dir=(0, 0, -1)), keep=Keep.TOP, mode=Mode.PRIVATE)
    fillet_6_piece_14 = split(fillet_6_piece_14, bisect_by=Plane(origin=(33.6, -0.75, 5.5), z_dir=(-1, 0, 0)), keep=Keep.TOP, mode=Mode.PRIVATE)
    add(fillet_6_piece_14)
    with BuildSketch(Plane(origin=(34.5, -0.75, 5.5), x_dir=(-1, 0, 0), z_dir=(0, 0, -1))) as fillet_6_piece_15_section:
        with BuildLine():
            CenterArc((FILLET_6_R, FILLET_6_R), FILLET_6_R, 180, 90)
            Line((0, FILLET_6_R), (0, 0))
            Line((0, 0), (FILLET_6_R, 0))
        make_face()
    fillet_6_piece_15 = extrude(amount=11, mode=Mode.PRIVATE)
    fillet_6_piece_15 = split(fillet_6_piece_15, bisect_by=Plane(origin=(34.5, -0.75, -2.5), z_dir=(0, 0, -1)), keep=Keep.TOP, mode=Mode.PRIVATE)
    fillet_6_piece_15 = split(fillet_6_piece_15, bisect_by=Plane(origin=(33.6, -0.75, 5.5), z_dir=(1, 0, 0)), keep=Keep.TOP, mode=Mode.PRIVATE)
    add(fillet_6_piece_15)
    with BuildSketch(Plane(origin=(24.5, 9.25, 5.5), x_dir=(1, 0, 0), z_dir=(0, 0, -1)), Plane(origin=(-24.5, 9.25, 5.5), x_dir=(0, -1, 0), z_dir=(0, 0, -1)), Plane(origin=(-34.5, 9.25, 5.5), x_dir=(1, 0, 0), z_dir=(0, 0, -1))) as fillet_6_piece_16:
        with BuildLine():
            CenterArc((FILLET_6_R, FILLET_6_R), FILLET_6_R, 180, 90)
            Line((0, FILLET_6_R), (0, 0))
            Line((0, 0), (FILLET_6_R, 0))
        make_face()
    extrude(amount=11)
    with BuildSketch(Plane(origin=(34.5, 9.25, 5.5), x_dir=(-1, 0, 0), z_dir=(0, 0, -1))) as fillet_6_piece_17:
        with BuildLine():
            CenterArc((FILLET_6_R, -FILLET_6_R), FILLET_6_R, 90, 90)
            Line((0, -FILLET_6_R), (0, 0))
            Line((0, 0), (FILLET_6_R, 0))
        make_face()
    extrude(amount=11)
    with BuildSketch(Plane(origin=(-34.5, -0.75, 5.5), x_dir=(1, 0, 0), z_dir=(0, 0, -1))) as fillet_6_piece_18_section:
        with BuildLine():
            CenterArc((FILLET_6_R, -FILLET_6_R), FILLET_6_R, 90, 90)
            Line((0, -FILLET_6_R), (0, 0))
            Line((0, 0), (FILLET_6_R, 0))
        make_face()
    fillet_6_piece_18 = extrude(amount=11, mode=Mode.PRIVATE)
    fillet_6_piece_18 = split(fillet_6_piece_18, bisect_by=Plane(origin=(-34.5, -0.75, 2.5), z_dir=(0, 0, 1)), keep=Keep.TOP, mode=Mode.PRIVATE)
    fillet_6_piece_18 = split(fillet_6_piece_18, bisect_by=Plane(origin=(-33.6, -0.75, 5.5), z_dir=(1, 0, 0)), keep=Keep.TOP, mode=Mode.PRIVATE)
    add(fillet_6_piece_18)
    with BuildSketch(Plane(origin=(-34.5, -0.75, 5.5), x_dir=(1, 0, 0), z_dir=(0, 0, -1))) as fillet_6_piece_19_section:
        with BuildLine():
            CenterArc((FILLET_6_R, -FILLET_6_R), FILLET_6_R, 90, 90)
            Line((0, -FILLET_6_R), (0, 0))
            Line((0, 0), (FILLET_6_R, 0))
        make_face()
    fillet_6_piece_19 = extrude(amount=11, mode=Mode.PRIVATE)
    fillet_6_piece_19 = split(fillet_6_piece_19, bisect_by=Plane(origin=(-34.5, -0.75, 2.5), z_dir=(0, 0, 1)), keep=Keep.TOP, mode=Mode.PRIVATE)
    fillet_6_piece_19 = split(fillet_6_piece_19, bisect_by=Plane(origin=(-33.6, -0.75, 5.5), z_dir=(-1, 0, 0)), keep=Keep.TOP, mode=Mode.PRIVATE)
    add(fillet_6_piece_19)
    with BuildSketch(Plane(origin=(-34.5, -0.75, 5.5), x_dir=(1, 0, 0), z_dir=(0, 0, -1))) as fillet_6_piece_20_section:
        with BuildLine():
            CenterArc((FILLET_6_R, -FILLET_6_R), FILLET_6_R, 90, 90)
            Line((0, -FILLET_6_R), (0, 0))
            Line((0, 0), (FILLET_6_R, 0))
        make_face()
    fillet_6_piece_20 = extrude(amount=11, mode=Mode.PRIVATE)
    fillet_6_piece_20 = split(fillet_6_piece_20, bisect_by=Plane(origin=(-34.5, -0.75, 2.5), z_dir=(0, 0, -1)), keep=Keep.TOP, mode=Mode.PRIVATE)
    fillet_6_piece_20 = split(fillet_6_piece_20, bisect_by=Plane(origin=(-33.6, -0.75, 5.5), z_dir=(-1, 0, 0)), keep=Keep.TOP, mode=Mode.PRIVATE)
    fillet_6_piece_20 = split(fillet_6_piece_20, bisect_by=Plane(origin=(-34.5, -0.75, -2.5), z_dir=(0, 0, 1)), keep=Keep.TOP, mode=Mode.PRIVATE)
    add(fillet_6_piece_20)
    with BuildSketch(Plane(origin=(-34.5, -0.75, 5.5), x_dir=(1, 0, 0), z_dir=(0, 0, -1))) as fillet_6_piece_21_section:
        with BuildLine():
            CenterArc((FILLET_6_R, -FILLET_6_R), FILLET_6_R, 90, 90)
            Line((0, -FILLET_6_R), (0, 0))
            Line((0, 0), (FILLET_6_R, 0))
        make_face()
    fillet_6_piece_21 = extrude(amount=11, mode=Mode.PRIVATE)
    fillet_6_piece_21 = split(fillet_6_piece_21, bisect_by=Plane(origin=(-33.6, -0.75, 5.5), z_dir=(1, 0, 0)), keep=Keep.TOP, mode=Mode.PRIVATE)
    fillet_6_piece_21 = split(fillet_6_piece_21, bisect_by=Plane(origin=(-34.5, -0.75, -2.5), z_dir=(0, 0, -1)), keep=Keep.TOP, mode=Mode.PRIVATE)
    add(fillet_6_piece_21)
    with BuildSketch(Plane(origin=(-34.5, -0.75, 5.5), x_dir=(1, 0, 0), z_dir=(0, 0, -1))) as fillet_6_piece_22_section:
        with BuildLine():
            CenterArc((FILLET_6_R, -FILLET_6_R), FILLET_6_R, 90, 90)
            Line((0, -FILLET_6_R), (0, 0))
            Line((0, 0), (FILLET_6_R, 0))
        make_face()
    fillet_6_piece_22 = extrude(amount=11, mode=Mode.PRIVATE)
    fillet_6_piece_22 = split(fillet_6_piece_22, bisect_by=Plane(origin=(-33.6, -0.75, 5.5), z_dir=(-1, 0, 0)), keep=Keep.TOP, mode=Mode.PRIVATE)
    fillet_6_piece_22 = split(fillet_6_piece_22, bisect_by=Plane(origin=(-34.5, -0.75, -2.5), z_dir=(0, 0, -1)), keep=Keep.TOP, mode=Mode.PRIVATE)
    add(fillet_6_piece_22)

    # 圆角7
    fillet_7_edges = [part_2.edges().sort_by_distance(p)[0] for p in [
        (-37.5, -5.125, -5.5),
        (-22.5, -13.625, 5.5),
        (-37.5, -5.125, 5.5),
        (37.5, -5.125, 5.5),
        (22.5, -13.625, 5.5),
        (22.5, -13.625, -5.5),
        (37.5, -5.125, -5.5),
        (-22.5, -13.625, -5.5),
    ]]
    fillet(fillet_7_edges, radius=FILLET_7_R)


solid = part_2.part
